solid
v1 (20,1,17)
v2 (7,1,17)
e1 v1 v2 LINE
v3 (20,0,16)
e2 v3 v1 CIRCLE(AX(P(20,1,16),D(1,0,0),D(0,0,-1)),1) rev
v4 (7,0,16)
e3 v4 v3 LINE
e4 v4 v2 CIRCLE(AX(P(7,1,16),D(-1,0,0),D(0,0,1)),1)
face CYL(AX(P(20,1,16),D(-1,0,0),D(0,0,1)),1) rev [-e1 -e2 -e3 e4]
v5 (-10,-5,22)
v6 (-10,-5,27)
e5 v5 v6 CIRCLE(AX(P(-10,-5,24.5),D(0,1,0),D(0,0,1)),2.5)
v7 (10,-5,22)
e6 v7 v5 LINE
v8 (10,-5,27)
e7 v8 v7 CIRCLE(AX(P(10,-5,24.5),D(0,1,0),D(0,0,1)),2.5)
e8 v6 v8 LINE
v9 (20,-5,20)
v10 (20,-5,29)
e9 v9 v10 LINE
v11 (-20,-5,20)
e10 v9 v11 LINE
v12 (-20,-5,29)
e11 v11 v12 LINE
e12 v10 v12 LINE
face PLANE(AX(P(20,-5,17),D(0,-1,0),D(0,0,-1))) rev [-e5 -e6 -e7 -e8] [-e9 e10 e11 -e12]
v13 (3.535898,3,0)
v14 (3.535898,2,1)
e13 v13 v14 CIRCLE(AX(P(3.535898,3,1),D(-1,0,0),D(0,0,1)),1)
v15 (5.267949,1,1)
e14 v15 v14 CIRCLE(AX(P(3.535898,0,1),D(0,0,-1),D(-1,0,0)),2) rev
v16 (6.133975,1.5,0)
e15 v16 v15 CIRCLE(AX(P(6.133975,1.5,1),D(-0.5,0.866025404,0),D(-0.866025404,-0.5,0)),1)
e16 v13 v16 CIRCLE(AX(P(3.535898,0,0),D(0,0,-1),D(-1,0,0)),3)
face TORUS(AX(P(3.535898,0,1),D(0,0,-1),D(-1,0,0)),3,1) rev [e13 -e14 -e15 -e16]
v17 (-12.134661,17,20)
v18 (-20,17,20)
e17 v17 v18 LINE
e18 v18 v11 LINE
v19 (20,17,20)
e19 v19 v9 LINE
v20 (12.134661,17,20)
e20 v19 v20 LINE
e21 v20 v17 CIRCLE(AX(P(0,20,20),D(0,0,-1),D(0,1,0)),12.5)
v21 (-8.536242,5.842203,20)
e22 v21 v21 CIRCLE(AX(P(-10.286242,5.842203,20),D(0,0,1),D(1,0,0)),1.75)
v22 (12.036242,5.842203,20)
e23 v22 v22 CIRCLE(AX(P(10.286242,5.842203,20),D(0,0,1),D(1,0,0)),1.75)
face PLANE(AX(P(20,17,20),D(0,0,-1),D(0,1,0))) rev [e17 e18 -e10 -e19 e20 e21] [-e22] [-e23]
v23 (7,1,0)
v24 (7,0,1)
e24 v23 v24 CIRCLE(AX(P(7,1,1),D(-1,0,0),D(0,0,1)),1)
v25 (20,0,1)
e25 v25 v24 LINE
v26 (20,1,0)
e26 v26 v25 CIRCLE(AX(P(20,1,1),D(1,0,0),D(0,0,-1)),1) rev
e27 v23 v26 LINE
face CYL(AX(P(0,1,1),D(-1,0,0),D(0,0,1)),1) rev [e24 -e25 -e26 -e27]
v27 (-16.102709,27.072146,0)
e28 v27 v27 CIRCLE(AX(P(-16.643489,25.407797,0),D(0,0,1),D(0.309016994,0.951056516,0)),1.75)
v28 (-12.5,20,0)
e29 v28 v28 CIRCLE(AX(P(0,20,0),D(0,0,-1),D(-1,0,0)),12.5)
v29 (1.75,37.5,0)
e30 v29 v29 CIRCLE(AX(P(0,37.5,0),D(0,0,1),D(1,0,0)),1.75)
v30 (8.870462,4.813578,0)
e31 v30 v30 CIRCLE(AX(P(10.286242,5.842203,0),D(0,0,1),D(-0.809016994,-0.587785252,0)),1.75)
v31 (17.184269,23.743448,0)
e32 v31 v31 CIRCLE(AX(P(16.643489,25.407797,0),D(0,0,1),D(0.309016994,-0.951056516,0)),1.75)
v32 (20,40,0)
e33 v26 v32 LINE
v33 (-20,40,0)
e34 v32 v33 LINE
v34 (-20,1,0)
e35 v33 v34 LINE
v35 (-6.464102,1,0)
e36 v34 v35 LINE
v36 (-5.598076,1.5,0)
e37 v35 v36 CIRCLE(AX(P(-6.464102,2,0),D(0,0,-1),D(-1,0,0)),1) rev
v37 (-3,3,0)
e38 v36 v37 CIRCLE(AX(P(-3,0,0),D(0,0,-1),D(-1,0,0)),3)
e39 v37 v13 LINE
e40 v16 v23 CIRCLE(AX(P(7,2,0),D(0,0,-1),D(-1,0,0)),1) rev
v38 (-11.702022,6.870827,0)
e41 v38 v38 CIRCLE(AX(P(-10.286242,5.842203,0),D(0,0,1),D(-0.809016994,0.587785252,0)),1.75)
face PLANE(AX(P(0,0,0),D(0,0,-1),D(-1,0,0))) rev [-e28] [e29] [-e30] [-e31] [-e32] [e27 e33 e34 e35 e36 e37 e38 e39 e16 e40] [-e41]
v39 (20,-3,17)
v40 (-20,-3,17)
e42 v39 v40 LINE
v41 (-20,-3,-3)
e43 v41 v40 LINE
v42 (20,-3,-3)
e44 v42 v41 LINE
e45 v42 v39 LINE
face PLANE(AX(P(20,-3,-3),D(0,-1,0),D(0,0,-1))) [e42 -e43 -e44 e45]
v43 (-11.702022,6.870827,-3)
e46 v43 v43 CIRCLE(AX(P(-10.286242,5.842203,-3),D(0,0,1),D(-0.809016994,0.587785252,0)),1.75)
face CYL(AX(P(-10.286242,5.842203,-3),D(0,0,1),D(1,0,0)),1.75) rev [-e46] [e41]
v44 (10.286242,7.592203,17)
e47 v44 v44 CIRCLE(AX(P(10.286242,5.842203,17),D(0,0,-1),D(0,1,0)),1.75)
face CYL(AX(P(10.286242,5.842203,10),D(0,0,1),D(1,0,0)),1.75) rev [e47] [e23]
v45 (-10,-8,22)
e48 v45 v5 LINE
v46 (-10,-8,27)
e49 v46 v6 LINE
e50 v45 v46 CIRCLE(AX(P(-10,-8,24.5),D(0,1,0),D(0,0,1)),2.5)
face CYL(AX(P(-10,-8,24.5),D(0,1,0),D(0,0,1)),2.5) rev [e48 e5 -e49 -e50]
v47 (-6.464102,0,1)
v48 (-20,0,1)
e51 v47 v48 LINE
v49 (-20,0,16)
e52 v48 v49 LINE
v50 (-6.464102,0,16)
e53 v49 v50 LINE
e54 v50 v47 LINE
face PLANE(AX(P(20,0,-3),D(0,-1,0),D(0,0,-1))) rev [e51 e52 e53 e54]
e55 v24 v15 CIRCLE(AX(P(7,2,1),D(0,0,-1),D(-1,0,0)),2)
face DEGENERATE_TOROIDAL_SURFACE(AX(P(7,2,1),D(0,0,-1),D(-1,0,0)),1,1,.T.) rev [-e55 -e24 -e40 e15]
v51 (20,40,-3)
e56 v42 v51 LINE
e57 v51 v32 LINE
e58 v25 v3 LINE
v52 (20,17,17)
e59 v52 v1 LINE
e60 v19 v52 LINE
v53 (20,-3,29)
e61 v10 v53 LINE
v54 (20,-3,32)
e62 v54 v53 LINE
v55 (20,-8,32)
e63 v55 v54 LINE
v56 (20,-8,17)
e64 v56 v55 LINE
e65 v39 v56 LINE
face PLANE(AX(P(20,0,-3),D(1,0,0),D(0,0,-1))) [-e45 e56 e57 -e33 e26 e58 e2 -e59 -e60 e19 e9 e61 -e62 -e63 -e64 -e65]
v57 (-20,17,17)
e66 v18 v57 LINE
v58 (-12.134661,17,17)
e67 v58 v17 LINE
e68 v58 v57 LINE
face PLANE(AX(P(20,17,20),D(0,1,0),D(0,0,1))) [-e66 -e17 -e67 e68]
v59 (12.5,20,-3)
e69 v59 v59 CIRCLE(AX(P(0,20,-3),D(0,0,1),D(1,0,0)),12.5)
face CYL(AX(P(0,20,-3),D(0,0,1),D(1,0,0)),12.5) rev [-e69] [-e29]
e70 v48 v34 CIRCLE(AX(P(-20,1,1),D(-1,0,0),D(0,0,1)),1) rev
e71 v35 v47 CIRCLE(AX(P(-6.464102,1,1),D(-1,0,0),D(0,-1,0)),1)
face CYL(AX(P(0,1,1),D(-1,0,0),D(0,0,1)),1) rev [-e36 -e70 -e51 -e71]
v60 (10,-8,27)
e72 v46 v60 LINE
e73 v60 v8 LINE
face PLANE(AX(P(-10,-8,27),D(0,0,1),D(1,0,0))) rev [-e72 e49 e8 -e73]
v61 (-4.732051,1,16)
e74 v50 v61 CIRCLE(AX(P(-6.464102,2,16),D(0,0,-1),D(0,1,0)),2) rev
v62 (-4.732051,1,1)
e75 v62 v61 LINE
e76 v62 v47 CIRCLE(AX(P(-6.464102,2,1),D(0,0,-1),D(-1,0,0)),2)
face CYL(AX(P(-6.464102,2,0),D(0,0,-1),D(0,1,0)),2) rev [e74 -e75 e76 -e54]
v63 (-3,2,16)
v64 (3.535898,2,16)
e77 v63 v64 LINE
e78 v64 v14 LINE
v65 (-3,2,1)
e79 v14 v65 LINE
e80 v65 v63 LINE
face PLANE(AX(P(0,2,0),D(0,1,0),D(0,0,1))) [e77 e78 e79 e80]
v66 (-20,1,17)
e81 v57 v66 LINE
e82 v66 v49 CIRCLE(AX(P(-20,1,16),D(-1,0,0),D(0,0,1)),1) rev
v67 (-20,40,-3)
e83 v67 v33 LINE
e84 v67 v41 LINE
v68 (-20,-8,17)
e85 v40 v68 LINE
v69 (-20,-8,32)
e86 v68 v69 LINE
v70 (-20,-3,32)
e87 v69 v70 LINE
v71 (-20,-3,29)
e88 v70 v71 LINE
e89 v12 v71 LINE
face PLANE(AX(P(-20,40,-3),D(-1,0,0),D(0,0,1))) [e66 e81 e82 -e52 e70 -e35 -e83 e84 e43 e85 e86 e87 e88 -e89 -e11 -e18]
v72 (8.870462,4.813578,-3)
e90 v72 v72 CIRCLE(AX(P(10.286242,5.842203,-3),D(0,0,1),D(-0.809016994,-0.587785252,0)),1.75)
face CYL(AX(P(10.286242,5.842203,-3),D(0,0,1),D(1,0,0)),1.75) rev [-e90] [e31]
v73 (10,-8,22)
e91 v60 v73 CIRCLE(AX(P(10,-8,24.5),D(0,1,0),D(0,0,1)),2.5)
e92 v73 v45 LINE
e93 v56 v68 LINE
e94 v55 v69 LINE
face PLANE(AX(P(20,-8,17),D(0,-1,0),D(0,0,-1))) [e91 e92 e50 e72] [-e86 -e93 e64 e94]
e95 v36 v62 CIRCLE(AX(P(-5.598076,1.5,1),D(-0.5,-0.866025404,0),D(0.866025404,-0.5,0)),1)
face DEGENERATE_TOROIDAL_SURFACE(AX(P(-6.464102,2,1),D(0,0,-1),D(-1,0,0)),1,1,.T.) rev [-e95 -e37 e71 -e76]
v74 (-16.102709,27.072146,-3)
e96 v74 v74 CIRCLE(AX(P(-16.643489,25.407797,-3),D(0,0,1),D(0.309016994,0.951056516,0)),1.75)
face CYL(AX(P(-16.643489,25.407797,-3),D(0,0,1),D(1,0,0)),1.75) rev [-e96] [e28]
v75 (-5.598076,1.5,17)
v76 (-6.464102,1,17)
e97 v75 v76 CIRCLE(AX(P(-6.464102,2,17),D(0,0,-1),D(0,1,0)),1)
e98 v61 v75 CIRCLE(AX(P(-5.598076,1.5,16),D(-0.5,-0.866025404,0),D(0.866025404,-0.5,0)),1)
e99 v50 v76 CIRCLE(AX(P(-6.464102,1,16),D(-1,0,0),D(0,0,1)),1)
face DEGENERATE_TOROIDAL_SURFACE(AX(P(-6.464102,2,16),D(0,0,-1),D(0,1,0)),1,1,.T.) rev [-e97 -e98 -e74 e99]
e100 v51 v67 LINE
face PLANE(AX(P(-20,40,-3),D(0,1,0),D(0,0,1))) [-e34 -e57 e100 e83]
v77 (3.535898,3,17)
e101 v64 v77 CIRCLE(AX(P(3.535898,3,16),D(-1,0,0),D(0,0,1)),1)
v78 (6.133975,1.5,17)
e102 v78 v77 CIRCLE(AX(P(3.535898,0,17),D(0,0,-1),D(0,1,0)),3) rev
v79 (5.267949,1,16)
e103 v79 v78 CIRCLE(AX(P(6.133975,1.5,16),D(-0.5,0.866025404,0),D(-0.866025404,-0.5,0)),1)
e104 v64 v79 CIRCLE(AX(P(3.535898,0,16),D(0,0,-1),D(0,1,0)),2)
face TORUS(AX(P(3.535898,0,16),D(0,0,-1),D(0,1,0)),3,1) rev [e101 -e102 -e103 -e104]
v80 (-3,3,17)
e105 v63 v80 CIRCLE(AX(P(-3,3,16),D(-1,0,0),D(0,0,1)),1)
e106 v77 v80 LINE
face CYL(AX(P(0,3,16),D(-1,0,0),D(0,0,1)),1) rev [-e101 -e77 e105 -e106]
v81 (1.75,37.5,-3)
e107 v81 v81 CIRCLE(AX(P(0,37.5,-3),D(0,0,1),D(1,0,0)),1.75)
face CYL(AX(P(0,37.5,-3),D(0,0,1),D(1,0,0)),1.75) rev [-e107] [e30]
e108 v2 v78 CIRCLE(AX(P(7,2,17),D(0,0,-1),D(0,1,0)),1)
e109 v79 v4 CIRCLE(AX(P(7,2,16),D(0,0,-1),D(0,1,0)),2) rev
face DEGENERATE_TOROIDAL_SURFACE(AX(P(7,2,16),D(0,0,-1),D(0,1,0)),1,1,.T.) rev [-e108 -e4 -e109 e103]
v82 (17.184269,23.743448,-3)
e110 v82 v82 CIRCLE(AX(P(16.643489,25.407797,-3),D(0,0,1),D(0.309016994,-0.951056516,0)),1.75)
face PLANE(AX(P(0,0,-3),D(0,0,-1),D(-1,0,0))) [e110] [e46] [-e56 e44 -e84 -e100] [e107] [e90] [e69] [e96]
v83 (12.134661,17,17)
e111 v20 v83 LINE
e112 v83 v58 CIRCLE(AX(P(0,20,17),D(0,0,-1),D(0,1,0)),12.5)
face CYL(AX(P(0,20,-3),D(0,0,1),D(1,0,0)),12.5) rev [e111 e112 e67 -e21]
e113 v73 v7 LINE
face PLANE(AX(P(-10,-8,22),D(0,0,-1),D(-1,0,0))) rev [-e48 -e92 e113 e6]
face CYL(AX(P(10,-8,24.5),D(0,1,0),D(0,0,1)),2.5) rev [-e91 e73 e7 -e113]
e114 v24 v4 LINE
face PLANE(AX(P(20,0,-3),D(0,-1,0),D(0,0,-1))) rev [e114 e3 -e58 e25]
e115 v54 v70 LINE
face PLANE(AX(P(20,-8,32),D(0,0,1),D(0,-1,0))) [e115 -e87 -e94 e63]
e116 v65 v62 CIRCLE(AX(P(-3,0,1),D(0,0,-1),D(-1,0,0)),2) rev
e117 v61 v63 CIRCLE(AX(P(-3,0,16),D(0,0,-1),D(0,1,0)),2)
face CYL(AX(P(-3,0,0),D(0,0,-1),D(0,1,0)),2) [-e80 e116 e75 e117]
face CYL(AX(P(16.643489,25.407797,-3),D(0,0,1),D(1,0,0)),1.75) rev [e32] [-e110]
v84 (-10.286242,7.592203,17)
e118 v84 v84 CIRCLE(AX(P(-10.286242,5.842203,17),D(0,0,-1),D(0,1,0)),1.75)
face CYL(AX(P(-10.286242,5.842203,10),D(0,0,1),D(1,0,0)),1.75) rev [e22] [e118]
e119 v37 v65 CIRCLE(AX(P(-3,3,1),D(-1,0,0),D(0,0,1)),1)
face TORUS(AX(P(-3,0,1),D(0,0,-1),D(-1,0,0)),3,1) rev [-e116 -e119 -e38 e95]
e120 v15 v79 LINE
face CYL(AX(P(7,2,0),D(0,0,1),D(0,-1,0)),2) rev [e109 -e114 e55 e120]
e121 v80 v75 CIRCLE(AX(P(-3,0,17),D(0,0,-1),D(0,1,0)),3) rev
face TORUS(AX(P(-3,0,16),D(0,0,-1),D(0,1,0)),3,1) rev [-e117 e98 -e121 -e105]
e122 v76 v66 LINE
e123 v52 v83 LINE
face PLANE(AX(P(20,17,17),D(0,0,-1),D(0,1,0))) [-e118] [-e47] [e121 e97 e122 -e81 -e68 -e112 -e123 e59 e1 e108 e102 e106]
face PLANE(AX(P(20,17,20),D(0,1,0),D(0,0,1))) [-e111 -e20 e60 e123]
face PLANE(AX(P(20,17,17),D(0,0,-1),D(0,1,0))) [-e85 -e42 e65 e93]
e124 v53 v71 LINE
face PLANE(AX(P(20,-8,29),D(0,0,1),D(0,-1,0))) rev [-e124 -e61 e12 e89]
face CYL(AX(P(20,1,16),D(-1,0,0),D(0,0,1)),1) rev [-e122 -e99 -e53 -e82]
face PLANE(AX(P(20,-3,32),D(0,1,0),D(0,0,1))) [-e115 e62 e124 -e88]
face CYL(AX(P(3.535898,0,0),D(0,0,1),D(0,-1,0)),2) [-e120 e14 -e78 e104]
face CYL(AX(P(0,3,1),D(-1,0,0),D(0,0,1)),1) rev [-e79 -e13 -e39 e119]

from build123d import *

# Parameters (mm, degrees)
SKETCH1_W           = 40
SKETCH1_H           = 40
BOSS_EXTRUDE1_DEPTH = 3
SKETCH3_W           = 20
SKETCH3_H           = 3
EXTRUDE_THIN1_DEPTH = 20
SKETCH4_W           = 10
SKETCH4_H           = 17
BOSS_EXTRUDE2_DEPTH = 2
EXTRUDE_THIN2_DEPTH = 20
SKETCH6_R           = 12.5
CUT_EXTRUDE1_DEPTH  = 57.789083458
SKETCH7_R           = 1.75
CUT_EXTRUDE2_DEPTH  = 55.990908339
CIRPATTERN1_COUNT   = 5
SKETCH8_R           = 1.75
CUT_EXTRUDE3_DEPTH  = 10
SKETCH9_R           = 1.75
CUT_EXTRUDE4_DEPTH  = 10
CUT_EXTRUDE5_DEPTH  = 59.72818744
FILLET1_R           = 2
FILLET3_R           = 2
FILLET4_R           = 2
FILLET5_R           = 2
FILLET2_R           = 1


with BuildPart() as part:
    # Sketch1 → Boss-Extrude1 (new body)
    with BuildSketch(Plane.XY):
        with Locations((0, 20)):
            Rectangle(SKETCH1_W, SKETCH1_H)
    extrude(amount=-BOSS_EXTRUDE1_DEPTH)

    # Sketch3 → Extrude-Thin1 (add, symmetric)
    with BuildSketch(Plane(origin=(0, 0, 0), x_dir=(0, 0, -1), z_dir=(1, 0, 0))):
        with Locations((-7, -1.5)):
            Rectangle(SKETCH3_W, SKETCH3_H)
    extrude(amount=EXTRUDE_THIN1_DEPTH, both=True)

    # Sketch4 → Boss-Extrude2 (add)
    with BuildSketch(Plane(origin=(0, 0, 0), x_dir=(1, 0, 0), z_dir=(0, 1, 0))):
        with Locations((0, -8.5)):
            Rectangle(SKETCH4_W, SKETCH4_H)
    extrude(amount=BOSS_EXTRUDE2_DEPTH)

    # Sketch5 → Extrude-Thin2 (add, symmetric)
    with BuildSketch(Plane(origin=(0, 0, 0), x_dir=(0, 0, -1), z_dir=(1, 0, 0))):
        Polygon((-17, 17), (-17, -8), (-32, -8), (-32, -3), (-29, -3), (-29, -5), (-20, -5), (-20, 17), align=None)
    extrude(amount=EXTRUDE_THIN2_DEPTH, both=True)

    # Sketch6 → Cut-Extrude1 (cut, through all)
    with BuildSketch(Plane.XY.offset(32)):
        with Locations((0, 20)):
            Circle(SKETCH6_R)
    extrude(amount=-CUT_EXTRUDE1_DEPTH, mode=Mode.SUBTRACT)

    # Sketch7 → Cut-Extrude2 (cut, through all)
    with BuildSketch(Plane.XY):
        with Locations((0, 37.5)):
            Circle(SKETCH7_R)
    cut_extrude2 = extrude(amount=-CUT_EXTRUDE2_DEPTH, mode=Mode.SUBTRACT)

    # CirPattern1: Cut-Extrude2 ×5 about axis
    cirpattern1_axis = Axis((0, 20, 0), (0, 0, 1))
    for i in range(1, CIRPATTERN1_COUNT):
        add(cut_extrude2.rotate(cirpattern1_axis, i * 360 / CIRPATTERN1_COUNT), mode=Mode.SUBTRACT)

    # Sketch8 → Cut-Extrude3 (cut)
    with BuildSketch(Plane.XY.offset(20)):
        with Locations(Location((10.286241915, 5.842202598, 0), (0, 0, 216))):
            Circle(SKETCH8_R)
    extrude(amount=-CUT_EXTRUDE3_DEPTH, mode=Mode.SUBTRACT)

    # Sketch9 → Cut-Extrude4 (cut)
    with BuildSketch(Plane.XY.offset(20)):
        with Locations(Location((-10.286241915, 5.842202598, 0), (0, 0, 144))):
            Circle(SKETCH9_R)
    extrude(amount=-CUT_EXTRUDE4_DEPTH, mode=Mode.SUBTRACT)

    # Sketch10 → Cut-Extrude5 (cut, through all)
    with BuildSketch(Plane(origin=(0, -5, 0), x_dir=(1, 0, 0), z_dir=(0, 1, 0))):
        with BuildLine():
            Line((-10, -22), (10, -22))
            ThreePointArc((10, -22), (12.5, -24.5), (10, -27))
            Line((10, -27), (-10, -27))
            ThreePointArc((-10, -27), (-12.5, -24.5), (-10, -22))
        make_face()
    extrude(amount=-CUT_EXTRUDE5_DEPTH, mode=Mode.SUBTRACT)

    # Fillet1
    fillet1_edges = [part.edges().sort_by_distance(p)[0] for p in [
        (5, 0, 8.5),
    ]]
    fillet(fillet1_edges, radius=FILLET1_R - 0.0001)  # a hair under: the kernel refuses the full size

    # Fillet3
    fillet3_edges = [part.edges().sort_by_distance(p)[0] for p in [
        (5, 2, 8.5),
    ]]
    fillet(fillet3_edges, radius=FILLET3_R)

    # Fillet4
    fillet4_edges = [part.edges().sort_by_distance(p)[0] for p in [
        (-5, 2, 8.5),
    ]]
    fillet(fillet4_edges, radius=FILLET4_R - 0.0001)  # a hair under: the kernel refuses the full size

    # Fillet5
    fillet5_edges = [part.edges().sort_by_distance(p)[0] for p in [
        (-5, 0, 8.5),
    ]]
    fillet(fillet5_edges, radius=FILLET5_R)

    # Fillet2
    fillet2_edges = [part.edges().sort_by_distance(p)[0] for p in [
        (13.49995, 0, 0),
        (5.9999375, 0.267943012, 17),
        (0.26787806, 2, 0),
        (5.9999375, 0.267943012, 0),
        (4.535868621, 1.73204359, 0),
        (4.535868621, 1.73204359, 17),
        (0.26787806, 2, 17),
        (-4.0000625, 1.732056988, 17),
        (-4.0000625, 1.732056988, 0),
        (-13.23207194, 0, 17),
        (-5.464131379, 0.26795641, 17),
        (-5.464131379, 0.26795641, 0),
        (13.49995, 0, 17),
        (-13.23207194, 0, 0),
    ]]
    fillet(fillet2_edges, radius=FILLET2_R)


solid = part.part
